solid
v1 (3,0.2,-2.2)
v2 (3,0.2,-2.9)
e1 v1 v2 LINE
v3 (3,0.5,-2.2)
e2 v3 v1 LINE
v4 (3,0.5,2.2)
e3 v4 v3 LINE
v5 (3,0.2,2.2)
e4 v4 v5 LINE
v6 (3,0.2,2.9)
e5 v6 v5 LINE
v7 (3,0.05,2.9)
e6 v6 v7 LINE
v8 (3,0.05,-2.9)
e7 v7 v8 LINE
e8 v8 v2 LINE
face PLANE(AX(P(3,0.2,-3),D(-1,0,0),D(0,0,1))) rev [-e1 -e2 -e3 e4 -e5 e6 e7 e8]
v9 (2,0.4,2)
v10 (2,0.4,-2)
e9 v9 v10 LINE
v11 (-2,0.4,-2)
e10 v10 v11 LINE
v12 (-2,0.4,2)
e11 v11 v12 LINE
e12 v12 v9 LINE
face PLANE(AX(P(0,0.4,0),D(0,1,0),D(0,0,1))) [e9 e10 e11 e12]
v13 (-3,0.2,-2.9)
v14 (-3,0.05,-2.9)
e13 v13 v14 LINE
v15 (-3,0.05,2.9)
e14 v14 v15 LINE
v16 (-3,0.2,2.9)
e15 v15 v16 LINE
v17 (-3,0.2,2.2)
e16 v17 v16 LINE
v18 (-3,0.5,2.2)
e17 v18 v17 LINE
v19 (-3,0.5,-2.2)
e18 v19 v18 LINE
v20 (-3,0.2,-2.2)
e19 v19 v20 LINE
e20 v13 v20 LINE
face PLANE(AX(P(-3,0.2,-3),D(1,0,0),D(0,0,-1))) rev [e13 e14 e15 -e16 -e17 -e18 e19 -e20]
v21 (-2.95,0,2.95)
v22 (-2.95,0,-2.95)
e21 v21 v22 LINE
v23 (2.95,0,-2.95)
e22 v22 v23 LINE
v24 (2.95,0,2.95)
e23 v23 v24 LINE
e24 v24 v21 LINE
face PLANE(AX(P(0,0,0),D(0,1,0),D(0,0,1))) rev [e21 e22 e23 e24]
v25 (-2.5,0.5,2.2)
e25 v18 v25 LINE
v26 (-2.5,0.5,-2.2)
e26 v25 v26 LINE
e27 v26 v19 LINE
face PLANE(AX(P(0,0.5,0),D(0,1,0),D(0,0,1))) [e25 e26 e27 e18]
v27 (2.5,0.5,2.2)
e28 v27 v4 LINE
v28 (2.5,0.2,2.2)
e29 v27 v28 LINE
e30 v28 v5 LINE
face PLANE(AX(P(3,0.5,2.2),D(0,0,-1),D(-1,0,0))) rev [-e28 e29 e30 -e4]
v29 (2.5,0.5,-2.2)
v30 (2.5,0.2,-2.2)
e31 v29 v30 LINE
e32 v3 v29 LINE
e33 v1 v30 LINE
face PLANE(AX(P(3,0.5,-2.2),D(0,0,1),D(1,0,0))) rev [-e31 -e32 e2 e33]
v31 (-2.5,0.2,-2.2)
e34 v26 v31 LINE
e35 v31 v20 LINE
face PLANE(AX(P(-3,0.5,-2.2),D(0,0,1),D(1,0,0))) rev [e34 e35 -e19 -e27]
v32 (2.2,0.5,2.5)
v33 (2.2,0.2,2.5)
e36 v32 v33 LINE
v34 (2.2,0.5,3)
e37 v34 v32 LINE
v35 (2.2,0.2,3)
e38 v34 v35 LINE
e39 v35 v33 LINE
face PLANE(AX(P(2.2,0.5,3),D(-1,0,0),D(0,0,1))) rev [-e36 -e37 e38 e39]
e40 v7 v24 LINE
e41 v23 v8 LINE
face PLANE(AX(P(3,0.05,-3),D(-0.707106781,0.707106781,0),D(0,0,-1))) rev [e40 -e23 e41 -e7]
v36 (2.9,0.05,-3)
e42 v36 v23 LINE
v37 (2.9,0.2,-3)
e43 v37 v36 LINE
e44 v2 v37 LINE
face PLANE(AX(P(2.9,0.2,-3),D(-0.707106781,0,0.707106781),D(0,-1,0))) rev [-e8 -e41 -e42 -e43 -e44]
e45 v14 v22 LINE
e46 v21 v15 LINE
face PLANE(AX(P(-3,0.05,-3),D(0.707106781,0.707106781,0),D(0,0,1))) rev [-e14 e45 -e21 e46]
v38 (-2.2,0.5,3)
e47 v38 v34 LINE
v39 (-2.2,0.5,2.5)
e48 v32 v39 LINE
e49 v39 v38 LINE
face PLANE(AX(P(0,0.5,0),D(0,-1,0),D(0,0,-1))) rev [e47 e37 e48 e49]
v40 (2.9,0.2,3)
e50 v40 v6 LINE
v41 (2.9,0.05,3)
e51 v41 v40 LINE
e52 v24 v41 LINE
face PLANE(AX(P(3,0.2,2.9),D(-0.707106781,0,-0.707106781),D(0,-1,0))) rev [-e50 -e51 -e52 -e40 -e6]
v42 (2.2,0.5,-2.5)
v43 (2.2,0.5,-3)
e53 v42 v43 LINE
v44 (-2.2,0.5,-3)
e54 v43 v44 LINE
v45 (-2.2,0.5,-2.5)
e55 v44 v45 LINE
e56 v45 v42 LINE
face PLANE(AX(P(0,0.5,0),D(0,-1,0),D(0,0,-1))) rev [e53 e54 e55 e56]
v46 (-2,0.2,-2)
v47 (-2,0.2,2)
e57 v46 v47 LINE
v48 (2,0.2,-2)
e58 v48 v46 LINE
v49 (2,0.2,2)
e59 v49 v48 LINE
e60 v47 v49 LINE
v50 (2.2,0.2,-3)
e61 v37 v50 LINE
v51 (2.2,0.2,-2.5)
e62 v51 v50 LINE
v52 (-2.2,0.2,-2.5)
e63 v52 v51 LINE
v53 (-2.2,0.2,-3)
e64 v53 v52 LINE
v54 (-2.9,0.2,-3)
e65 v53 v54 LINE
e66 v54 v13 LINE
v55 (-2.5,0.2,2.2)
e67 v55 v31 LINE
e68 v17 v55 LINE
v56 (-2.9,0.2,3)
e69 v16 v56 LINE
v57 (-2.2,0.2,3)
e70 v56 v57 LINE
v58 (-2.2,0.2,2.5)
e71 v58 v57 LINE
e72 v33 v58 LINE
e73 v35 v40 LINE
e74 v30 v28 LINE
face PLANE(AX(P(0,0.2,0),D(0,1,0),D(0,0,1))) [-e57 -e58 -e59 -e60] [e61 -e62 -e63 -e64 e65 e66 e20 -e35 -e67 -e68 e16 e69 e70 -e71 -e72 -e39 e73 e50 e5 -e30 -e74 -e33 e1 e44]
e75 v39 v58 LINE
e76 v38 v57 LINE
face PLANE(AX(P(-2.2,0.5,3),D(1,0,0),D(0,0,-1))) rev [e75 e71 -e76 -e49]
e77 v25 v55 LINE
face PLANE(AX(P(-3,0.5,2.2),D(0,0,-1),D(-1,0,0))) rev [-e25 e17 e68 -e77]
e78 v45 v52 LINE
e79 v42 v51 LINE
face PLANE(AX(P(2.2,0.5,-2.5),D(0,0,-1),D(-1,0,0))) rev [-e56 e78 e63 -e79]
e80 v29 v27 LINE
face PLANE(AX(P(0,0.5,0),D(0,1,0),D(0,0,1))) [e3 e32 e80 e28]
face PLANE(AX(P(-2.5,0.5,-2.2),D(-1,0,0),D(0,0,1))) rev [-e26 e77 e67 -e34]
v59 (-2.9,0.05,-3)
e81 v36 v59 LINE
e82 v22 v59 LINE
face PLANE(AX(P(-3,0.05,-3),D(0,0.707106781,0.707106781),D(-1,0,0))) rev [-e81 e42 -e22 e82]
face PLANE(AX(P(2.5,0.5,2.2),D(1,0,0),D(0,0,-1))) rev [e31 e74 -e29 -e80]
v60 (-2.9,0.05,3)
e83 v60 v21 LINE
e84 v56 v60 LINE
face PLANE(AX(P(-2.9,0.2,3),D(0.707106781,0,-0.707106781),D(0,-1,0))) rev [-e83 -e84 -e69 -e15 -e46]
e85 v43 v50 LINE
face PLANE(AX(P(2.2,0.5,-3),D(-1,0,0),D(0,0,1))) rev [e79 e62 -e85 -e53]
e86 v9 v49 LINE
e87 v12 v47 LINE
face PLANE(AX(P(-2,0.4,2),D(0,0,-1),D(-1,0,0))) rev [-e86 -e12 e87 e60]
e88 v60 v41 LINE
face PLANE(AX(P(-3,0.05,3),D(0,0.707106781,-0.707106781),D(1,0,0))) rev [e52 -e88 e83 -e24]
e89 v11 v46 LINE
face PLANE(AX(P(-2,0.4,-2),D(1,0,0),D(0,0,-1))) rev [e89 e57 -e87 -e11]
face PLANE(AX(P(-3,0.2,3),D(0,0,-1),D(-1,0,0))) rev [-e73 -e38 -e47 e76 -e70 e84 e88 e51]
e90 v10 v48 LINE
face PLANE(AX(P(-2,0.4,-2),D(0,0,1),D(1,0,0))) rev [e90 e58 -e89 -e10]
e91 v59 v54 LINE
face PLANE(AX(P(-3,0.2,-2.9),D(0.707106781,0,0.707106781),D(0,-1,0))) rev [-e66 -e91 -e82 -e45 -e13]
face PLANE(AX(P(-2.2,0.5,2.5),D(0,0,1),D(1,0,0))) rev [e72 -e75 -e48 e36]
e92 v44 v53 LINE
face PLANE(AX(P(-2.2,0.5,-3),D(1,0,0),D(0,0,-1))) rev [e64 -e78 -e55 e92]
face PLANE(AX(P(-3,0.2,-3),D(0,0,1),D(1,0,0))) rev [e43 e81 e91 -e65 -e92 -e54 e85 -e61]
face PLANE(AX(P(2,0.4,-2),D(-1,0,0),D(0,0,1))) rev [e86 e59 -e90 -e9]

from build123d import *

# Parameters (mm, degrees)
SKETCH_1_W      = 6
SKETCH_1_H      = 6
EXTRUDE_1_DEPTH = 0.2
SKETCH_2_W      = 4
SKETCH_2_H      = 4
EXTRUDE_2_DEPTH = 0.2
SKETCH_3_W      = 0.5
SKETCH_3_H      = 4.4
SKETCH_3_W_2    = 4.4
SKETCH_3_H_2    = 0.5
EXTRUDE_3_DEPTH = 0.3
CHAMFER_1_SIZE  = 0.05
CHAMFER_2_SIZE  = 0.1


with BuildPart() as part:
    # 草图1 → 凸台-拉伸1 (new body)
    with BuildSketch(Plane(origin=(0, 0, 0), x_dir=(1, 0, 0), z_dir=(0, 1, 0))):
        Rectangle(SKETCH_1_W, SKETCH_1_H)
    extrude(amount=EXTRUDE_1_DEPTH)

    # 草图2 → 凸台-拉伸2 (add)
    with BuildSketch(Plane(origin=(0, 0.2, 0), x_dir=(1, 0, 0), z_dir=(0, 1, 0))):
        Rectangle(SKETCH_2_W, SKETCH_2_H)
    extrude(amount=EXTRUDE_2_DEPTH)

    # 草图3 → 凸台-拉伸3 (add)
    with BuildSketch(Plane(origin=(0, 0.2, 0), x_dir=(1, 0, 0), z_dir=(0, 1, 0))):
        with Locations((-2.75, 0)):
            Rectangle(SKETCH_3_W, SKETCH_3_H)
        with Locations((0, -2.75)):
            Rectangle(SKETCH_3_W_2, SKETCH_3_H_2)
        with Locations((2.75, 0)):
            Rectangle(SKETCH_3_W, SKETCH_3_H)
        with Locations((0, 2.75)):
            Rectangle(SKETCH_3_W_2, SKETCH_3_H_2)
    extrude(amount=EXTRUDE_3_DEPTH)

    # 倒角1
    chamfer_1_edges = [part.edges().sort_by_distance(p)[0] for p in [
        (0, 0, 3),
        (-3, 0, 0),
        (0, 0, -3),
        (3, 0, 0),
    ]]
    chamfer(chamfer_1_edges, length=CHAMFER_1_SIZE)

    # 倒角2
    chamfer_2_edges = [part.edges().sort_by_distance(p)[0] for p in [
        (3, 0.125, 3),
        (3, 0.125, -3),
        (-3, 0.125, -3),
        (-3, 0.125, 3),
    ]]
    chamfer(chamfer_2_edges, length=CHAMFER_2_SIZE - 0.0001)  # a hair under: the kernel refuses the full size


solid = part.part
